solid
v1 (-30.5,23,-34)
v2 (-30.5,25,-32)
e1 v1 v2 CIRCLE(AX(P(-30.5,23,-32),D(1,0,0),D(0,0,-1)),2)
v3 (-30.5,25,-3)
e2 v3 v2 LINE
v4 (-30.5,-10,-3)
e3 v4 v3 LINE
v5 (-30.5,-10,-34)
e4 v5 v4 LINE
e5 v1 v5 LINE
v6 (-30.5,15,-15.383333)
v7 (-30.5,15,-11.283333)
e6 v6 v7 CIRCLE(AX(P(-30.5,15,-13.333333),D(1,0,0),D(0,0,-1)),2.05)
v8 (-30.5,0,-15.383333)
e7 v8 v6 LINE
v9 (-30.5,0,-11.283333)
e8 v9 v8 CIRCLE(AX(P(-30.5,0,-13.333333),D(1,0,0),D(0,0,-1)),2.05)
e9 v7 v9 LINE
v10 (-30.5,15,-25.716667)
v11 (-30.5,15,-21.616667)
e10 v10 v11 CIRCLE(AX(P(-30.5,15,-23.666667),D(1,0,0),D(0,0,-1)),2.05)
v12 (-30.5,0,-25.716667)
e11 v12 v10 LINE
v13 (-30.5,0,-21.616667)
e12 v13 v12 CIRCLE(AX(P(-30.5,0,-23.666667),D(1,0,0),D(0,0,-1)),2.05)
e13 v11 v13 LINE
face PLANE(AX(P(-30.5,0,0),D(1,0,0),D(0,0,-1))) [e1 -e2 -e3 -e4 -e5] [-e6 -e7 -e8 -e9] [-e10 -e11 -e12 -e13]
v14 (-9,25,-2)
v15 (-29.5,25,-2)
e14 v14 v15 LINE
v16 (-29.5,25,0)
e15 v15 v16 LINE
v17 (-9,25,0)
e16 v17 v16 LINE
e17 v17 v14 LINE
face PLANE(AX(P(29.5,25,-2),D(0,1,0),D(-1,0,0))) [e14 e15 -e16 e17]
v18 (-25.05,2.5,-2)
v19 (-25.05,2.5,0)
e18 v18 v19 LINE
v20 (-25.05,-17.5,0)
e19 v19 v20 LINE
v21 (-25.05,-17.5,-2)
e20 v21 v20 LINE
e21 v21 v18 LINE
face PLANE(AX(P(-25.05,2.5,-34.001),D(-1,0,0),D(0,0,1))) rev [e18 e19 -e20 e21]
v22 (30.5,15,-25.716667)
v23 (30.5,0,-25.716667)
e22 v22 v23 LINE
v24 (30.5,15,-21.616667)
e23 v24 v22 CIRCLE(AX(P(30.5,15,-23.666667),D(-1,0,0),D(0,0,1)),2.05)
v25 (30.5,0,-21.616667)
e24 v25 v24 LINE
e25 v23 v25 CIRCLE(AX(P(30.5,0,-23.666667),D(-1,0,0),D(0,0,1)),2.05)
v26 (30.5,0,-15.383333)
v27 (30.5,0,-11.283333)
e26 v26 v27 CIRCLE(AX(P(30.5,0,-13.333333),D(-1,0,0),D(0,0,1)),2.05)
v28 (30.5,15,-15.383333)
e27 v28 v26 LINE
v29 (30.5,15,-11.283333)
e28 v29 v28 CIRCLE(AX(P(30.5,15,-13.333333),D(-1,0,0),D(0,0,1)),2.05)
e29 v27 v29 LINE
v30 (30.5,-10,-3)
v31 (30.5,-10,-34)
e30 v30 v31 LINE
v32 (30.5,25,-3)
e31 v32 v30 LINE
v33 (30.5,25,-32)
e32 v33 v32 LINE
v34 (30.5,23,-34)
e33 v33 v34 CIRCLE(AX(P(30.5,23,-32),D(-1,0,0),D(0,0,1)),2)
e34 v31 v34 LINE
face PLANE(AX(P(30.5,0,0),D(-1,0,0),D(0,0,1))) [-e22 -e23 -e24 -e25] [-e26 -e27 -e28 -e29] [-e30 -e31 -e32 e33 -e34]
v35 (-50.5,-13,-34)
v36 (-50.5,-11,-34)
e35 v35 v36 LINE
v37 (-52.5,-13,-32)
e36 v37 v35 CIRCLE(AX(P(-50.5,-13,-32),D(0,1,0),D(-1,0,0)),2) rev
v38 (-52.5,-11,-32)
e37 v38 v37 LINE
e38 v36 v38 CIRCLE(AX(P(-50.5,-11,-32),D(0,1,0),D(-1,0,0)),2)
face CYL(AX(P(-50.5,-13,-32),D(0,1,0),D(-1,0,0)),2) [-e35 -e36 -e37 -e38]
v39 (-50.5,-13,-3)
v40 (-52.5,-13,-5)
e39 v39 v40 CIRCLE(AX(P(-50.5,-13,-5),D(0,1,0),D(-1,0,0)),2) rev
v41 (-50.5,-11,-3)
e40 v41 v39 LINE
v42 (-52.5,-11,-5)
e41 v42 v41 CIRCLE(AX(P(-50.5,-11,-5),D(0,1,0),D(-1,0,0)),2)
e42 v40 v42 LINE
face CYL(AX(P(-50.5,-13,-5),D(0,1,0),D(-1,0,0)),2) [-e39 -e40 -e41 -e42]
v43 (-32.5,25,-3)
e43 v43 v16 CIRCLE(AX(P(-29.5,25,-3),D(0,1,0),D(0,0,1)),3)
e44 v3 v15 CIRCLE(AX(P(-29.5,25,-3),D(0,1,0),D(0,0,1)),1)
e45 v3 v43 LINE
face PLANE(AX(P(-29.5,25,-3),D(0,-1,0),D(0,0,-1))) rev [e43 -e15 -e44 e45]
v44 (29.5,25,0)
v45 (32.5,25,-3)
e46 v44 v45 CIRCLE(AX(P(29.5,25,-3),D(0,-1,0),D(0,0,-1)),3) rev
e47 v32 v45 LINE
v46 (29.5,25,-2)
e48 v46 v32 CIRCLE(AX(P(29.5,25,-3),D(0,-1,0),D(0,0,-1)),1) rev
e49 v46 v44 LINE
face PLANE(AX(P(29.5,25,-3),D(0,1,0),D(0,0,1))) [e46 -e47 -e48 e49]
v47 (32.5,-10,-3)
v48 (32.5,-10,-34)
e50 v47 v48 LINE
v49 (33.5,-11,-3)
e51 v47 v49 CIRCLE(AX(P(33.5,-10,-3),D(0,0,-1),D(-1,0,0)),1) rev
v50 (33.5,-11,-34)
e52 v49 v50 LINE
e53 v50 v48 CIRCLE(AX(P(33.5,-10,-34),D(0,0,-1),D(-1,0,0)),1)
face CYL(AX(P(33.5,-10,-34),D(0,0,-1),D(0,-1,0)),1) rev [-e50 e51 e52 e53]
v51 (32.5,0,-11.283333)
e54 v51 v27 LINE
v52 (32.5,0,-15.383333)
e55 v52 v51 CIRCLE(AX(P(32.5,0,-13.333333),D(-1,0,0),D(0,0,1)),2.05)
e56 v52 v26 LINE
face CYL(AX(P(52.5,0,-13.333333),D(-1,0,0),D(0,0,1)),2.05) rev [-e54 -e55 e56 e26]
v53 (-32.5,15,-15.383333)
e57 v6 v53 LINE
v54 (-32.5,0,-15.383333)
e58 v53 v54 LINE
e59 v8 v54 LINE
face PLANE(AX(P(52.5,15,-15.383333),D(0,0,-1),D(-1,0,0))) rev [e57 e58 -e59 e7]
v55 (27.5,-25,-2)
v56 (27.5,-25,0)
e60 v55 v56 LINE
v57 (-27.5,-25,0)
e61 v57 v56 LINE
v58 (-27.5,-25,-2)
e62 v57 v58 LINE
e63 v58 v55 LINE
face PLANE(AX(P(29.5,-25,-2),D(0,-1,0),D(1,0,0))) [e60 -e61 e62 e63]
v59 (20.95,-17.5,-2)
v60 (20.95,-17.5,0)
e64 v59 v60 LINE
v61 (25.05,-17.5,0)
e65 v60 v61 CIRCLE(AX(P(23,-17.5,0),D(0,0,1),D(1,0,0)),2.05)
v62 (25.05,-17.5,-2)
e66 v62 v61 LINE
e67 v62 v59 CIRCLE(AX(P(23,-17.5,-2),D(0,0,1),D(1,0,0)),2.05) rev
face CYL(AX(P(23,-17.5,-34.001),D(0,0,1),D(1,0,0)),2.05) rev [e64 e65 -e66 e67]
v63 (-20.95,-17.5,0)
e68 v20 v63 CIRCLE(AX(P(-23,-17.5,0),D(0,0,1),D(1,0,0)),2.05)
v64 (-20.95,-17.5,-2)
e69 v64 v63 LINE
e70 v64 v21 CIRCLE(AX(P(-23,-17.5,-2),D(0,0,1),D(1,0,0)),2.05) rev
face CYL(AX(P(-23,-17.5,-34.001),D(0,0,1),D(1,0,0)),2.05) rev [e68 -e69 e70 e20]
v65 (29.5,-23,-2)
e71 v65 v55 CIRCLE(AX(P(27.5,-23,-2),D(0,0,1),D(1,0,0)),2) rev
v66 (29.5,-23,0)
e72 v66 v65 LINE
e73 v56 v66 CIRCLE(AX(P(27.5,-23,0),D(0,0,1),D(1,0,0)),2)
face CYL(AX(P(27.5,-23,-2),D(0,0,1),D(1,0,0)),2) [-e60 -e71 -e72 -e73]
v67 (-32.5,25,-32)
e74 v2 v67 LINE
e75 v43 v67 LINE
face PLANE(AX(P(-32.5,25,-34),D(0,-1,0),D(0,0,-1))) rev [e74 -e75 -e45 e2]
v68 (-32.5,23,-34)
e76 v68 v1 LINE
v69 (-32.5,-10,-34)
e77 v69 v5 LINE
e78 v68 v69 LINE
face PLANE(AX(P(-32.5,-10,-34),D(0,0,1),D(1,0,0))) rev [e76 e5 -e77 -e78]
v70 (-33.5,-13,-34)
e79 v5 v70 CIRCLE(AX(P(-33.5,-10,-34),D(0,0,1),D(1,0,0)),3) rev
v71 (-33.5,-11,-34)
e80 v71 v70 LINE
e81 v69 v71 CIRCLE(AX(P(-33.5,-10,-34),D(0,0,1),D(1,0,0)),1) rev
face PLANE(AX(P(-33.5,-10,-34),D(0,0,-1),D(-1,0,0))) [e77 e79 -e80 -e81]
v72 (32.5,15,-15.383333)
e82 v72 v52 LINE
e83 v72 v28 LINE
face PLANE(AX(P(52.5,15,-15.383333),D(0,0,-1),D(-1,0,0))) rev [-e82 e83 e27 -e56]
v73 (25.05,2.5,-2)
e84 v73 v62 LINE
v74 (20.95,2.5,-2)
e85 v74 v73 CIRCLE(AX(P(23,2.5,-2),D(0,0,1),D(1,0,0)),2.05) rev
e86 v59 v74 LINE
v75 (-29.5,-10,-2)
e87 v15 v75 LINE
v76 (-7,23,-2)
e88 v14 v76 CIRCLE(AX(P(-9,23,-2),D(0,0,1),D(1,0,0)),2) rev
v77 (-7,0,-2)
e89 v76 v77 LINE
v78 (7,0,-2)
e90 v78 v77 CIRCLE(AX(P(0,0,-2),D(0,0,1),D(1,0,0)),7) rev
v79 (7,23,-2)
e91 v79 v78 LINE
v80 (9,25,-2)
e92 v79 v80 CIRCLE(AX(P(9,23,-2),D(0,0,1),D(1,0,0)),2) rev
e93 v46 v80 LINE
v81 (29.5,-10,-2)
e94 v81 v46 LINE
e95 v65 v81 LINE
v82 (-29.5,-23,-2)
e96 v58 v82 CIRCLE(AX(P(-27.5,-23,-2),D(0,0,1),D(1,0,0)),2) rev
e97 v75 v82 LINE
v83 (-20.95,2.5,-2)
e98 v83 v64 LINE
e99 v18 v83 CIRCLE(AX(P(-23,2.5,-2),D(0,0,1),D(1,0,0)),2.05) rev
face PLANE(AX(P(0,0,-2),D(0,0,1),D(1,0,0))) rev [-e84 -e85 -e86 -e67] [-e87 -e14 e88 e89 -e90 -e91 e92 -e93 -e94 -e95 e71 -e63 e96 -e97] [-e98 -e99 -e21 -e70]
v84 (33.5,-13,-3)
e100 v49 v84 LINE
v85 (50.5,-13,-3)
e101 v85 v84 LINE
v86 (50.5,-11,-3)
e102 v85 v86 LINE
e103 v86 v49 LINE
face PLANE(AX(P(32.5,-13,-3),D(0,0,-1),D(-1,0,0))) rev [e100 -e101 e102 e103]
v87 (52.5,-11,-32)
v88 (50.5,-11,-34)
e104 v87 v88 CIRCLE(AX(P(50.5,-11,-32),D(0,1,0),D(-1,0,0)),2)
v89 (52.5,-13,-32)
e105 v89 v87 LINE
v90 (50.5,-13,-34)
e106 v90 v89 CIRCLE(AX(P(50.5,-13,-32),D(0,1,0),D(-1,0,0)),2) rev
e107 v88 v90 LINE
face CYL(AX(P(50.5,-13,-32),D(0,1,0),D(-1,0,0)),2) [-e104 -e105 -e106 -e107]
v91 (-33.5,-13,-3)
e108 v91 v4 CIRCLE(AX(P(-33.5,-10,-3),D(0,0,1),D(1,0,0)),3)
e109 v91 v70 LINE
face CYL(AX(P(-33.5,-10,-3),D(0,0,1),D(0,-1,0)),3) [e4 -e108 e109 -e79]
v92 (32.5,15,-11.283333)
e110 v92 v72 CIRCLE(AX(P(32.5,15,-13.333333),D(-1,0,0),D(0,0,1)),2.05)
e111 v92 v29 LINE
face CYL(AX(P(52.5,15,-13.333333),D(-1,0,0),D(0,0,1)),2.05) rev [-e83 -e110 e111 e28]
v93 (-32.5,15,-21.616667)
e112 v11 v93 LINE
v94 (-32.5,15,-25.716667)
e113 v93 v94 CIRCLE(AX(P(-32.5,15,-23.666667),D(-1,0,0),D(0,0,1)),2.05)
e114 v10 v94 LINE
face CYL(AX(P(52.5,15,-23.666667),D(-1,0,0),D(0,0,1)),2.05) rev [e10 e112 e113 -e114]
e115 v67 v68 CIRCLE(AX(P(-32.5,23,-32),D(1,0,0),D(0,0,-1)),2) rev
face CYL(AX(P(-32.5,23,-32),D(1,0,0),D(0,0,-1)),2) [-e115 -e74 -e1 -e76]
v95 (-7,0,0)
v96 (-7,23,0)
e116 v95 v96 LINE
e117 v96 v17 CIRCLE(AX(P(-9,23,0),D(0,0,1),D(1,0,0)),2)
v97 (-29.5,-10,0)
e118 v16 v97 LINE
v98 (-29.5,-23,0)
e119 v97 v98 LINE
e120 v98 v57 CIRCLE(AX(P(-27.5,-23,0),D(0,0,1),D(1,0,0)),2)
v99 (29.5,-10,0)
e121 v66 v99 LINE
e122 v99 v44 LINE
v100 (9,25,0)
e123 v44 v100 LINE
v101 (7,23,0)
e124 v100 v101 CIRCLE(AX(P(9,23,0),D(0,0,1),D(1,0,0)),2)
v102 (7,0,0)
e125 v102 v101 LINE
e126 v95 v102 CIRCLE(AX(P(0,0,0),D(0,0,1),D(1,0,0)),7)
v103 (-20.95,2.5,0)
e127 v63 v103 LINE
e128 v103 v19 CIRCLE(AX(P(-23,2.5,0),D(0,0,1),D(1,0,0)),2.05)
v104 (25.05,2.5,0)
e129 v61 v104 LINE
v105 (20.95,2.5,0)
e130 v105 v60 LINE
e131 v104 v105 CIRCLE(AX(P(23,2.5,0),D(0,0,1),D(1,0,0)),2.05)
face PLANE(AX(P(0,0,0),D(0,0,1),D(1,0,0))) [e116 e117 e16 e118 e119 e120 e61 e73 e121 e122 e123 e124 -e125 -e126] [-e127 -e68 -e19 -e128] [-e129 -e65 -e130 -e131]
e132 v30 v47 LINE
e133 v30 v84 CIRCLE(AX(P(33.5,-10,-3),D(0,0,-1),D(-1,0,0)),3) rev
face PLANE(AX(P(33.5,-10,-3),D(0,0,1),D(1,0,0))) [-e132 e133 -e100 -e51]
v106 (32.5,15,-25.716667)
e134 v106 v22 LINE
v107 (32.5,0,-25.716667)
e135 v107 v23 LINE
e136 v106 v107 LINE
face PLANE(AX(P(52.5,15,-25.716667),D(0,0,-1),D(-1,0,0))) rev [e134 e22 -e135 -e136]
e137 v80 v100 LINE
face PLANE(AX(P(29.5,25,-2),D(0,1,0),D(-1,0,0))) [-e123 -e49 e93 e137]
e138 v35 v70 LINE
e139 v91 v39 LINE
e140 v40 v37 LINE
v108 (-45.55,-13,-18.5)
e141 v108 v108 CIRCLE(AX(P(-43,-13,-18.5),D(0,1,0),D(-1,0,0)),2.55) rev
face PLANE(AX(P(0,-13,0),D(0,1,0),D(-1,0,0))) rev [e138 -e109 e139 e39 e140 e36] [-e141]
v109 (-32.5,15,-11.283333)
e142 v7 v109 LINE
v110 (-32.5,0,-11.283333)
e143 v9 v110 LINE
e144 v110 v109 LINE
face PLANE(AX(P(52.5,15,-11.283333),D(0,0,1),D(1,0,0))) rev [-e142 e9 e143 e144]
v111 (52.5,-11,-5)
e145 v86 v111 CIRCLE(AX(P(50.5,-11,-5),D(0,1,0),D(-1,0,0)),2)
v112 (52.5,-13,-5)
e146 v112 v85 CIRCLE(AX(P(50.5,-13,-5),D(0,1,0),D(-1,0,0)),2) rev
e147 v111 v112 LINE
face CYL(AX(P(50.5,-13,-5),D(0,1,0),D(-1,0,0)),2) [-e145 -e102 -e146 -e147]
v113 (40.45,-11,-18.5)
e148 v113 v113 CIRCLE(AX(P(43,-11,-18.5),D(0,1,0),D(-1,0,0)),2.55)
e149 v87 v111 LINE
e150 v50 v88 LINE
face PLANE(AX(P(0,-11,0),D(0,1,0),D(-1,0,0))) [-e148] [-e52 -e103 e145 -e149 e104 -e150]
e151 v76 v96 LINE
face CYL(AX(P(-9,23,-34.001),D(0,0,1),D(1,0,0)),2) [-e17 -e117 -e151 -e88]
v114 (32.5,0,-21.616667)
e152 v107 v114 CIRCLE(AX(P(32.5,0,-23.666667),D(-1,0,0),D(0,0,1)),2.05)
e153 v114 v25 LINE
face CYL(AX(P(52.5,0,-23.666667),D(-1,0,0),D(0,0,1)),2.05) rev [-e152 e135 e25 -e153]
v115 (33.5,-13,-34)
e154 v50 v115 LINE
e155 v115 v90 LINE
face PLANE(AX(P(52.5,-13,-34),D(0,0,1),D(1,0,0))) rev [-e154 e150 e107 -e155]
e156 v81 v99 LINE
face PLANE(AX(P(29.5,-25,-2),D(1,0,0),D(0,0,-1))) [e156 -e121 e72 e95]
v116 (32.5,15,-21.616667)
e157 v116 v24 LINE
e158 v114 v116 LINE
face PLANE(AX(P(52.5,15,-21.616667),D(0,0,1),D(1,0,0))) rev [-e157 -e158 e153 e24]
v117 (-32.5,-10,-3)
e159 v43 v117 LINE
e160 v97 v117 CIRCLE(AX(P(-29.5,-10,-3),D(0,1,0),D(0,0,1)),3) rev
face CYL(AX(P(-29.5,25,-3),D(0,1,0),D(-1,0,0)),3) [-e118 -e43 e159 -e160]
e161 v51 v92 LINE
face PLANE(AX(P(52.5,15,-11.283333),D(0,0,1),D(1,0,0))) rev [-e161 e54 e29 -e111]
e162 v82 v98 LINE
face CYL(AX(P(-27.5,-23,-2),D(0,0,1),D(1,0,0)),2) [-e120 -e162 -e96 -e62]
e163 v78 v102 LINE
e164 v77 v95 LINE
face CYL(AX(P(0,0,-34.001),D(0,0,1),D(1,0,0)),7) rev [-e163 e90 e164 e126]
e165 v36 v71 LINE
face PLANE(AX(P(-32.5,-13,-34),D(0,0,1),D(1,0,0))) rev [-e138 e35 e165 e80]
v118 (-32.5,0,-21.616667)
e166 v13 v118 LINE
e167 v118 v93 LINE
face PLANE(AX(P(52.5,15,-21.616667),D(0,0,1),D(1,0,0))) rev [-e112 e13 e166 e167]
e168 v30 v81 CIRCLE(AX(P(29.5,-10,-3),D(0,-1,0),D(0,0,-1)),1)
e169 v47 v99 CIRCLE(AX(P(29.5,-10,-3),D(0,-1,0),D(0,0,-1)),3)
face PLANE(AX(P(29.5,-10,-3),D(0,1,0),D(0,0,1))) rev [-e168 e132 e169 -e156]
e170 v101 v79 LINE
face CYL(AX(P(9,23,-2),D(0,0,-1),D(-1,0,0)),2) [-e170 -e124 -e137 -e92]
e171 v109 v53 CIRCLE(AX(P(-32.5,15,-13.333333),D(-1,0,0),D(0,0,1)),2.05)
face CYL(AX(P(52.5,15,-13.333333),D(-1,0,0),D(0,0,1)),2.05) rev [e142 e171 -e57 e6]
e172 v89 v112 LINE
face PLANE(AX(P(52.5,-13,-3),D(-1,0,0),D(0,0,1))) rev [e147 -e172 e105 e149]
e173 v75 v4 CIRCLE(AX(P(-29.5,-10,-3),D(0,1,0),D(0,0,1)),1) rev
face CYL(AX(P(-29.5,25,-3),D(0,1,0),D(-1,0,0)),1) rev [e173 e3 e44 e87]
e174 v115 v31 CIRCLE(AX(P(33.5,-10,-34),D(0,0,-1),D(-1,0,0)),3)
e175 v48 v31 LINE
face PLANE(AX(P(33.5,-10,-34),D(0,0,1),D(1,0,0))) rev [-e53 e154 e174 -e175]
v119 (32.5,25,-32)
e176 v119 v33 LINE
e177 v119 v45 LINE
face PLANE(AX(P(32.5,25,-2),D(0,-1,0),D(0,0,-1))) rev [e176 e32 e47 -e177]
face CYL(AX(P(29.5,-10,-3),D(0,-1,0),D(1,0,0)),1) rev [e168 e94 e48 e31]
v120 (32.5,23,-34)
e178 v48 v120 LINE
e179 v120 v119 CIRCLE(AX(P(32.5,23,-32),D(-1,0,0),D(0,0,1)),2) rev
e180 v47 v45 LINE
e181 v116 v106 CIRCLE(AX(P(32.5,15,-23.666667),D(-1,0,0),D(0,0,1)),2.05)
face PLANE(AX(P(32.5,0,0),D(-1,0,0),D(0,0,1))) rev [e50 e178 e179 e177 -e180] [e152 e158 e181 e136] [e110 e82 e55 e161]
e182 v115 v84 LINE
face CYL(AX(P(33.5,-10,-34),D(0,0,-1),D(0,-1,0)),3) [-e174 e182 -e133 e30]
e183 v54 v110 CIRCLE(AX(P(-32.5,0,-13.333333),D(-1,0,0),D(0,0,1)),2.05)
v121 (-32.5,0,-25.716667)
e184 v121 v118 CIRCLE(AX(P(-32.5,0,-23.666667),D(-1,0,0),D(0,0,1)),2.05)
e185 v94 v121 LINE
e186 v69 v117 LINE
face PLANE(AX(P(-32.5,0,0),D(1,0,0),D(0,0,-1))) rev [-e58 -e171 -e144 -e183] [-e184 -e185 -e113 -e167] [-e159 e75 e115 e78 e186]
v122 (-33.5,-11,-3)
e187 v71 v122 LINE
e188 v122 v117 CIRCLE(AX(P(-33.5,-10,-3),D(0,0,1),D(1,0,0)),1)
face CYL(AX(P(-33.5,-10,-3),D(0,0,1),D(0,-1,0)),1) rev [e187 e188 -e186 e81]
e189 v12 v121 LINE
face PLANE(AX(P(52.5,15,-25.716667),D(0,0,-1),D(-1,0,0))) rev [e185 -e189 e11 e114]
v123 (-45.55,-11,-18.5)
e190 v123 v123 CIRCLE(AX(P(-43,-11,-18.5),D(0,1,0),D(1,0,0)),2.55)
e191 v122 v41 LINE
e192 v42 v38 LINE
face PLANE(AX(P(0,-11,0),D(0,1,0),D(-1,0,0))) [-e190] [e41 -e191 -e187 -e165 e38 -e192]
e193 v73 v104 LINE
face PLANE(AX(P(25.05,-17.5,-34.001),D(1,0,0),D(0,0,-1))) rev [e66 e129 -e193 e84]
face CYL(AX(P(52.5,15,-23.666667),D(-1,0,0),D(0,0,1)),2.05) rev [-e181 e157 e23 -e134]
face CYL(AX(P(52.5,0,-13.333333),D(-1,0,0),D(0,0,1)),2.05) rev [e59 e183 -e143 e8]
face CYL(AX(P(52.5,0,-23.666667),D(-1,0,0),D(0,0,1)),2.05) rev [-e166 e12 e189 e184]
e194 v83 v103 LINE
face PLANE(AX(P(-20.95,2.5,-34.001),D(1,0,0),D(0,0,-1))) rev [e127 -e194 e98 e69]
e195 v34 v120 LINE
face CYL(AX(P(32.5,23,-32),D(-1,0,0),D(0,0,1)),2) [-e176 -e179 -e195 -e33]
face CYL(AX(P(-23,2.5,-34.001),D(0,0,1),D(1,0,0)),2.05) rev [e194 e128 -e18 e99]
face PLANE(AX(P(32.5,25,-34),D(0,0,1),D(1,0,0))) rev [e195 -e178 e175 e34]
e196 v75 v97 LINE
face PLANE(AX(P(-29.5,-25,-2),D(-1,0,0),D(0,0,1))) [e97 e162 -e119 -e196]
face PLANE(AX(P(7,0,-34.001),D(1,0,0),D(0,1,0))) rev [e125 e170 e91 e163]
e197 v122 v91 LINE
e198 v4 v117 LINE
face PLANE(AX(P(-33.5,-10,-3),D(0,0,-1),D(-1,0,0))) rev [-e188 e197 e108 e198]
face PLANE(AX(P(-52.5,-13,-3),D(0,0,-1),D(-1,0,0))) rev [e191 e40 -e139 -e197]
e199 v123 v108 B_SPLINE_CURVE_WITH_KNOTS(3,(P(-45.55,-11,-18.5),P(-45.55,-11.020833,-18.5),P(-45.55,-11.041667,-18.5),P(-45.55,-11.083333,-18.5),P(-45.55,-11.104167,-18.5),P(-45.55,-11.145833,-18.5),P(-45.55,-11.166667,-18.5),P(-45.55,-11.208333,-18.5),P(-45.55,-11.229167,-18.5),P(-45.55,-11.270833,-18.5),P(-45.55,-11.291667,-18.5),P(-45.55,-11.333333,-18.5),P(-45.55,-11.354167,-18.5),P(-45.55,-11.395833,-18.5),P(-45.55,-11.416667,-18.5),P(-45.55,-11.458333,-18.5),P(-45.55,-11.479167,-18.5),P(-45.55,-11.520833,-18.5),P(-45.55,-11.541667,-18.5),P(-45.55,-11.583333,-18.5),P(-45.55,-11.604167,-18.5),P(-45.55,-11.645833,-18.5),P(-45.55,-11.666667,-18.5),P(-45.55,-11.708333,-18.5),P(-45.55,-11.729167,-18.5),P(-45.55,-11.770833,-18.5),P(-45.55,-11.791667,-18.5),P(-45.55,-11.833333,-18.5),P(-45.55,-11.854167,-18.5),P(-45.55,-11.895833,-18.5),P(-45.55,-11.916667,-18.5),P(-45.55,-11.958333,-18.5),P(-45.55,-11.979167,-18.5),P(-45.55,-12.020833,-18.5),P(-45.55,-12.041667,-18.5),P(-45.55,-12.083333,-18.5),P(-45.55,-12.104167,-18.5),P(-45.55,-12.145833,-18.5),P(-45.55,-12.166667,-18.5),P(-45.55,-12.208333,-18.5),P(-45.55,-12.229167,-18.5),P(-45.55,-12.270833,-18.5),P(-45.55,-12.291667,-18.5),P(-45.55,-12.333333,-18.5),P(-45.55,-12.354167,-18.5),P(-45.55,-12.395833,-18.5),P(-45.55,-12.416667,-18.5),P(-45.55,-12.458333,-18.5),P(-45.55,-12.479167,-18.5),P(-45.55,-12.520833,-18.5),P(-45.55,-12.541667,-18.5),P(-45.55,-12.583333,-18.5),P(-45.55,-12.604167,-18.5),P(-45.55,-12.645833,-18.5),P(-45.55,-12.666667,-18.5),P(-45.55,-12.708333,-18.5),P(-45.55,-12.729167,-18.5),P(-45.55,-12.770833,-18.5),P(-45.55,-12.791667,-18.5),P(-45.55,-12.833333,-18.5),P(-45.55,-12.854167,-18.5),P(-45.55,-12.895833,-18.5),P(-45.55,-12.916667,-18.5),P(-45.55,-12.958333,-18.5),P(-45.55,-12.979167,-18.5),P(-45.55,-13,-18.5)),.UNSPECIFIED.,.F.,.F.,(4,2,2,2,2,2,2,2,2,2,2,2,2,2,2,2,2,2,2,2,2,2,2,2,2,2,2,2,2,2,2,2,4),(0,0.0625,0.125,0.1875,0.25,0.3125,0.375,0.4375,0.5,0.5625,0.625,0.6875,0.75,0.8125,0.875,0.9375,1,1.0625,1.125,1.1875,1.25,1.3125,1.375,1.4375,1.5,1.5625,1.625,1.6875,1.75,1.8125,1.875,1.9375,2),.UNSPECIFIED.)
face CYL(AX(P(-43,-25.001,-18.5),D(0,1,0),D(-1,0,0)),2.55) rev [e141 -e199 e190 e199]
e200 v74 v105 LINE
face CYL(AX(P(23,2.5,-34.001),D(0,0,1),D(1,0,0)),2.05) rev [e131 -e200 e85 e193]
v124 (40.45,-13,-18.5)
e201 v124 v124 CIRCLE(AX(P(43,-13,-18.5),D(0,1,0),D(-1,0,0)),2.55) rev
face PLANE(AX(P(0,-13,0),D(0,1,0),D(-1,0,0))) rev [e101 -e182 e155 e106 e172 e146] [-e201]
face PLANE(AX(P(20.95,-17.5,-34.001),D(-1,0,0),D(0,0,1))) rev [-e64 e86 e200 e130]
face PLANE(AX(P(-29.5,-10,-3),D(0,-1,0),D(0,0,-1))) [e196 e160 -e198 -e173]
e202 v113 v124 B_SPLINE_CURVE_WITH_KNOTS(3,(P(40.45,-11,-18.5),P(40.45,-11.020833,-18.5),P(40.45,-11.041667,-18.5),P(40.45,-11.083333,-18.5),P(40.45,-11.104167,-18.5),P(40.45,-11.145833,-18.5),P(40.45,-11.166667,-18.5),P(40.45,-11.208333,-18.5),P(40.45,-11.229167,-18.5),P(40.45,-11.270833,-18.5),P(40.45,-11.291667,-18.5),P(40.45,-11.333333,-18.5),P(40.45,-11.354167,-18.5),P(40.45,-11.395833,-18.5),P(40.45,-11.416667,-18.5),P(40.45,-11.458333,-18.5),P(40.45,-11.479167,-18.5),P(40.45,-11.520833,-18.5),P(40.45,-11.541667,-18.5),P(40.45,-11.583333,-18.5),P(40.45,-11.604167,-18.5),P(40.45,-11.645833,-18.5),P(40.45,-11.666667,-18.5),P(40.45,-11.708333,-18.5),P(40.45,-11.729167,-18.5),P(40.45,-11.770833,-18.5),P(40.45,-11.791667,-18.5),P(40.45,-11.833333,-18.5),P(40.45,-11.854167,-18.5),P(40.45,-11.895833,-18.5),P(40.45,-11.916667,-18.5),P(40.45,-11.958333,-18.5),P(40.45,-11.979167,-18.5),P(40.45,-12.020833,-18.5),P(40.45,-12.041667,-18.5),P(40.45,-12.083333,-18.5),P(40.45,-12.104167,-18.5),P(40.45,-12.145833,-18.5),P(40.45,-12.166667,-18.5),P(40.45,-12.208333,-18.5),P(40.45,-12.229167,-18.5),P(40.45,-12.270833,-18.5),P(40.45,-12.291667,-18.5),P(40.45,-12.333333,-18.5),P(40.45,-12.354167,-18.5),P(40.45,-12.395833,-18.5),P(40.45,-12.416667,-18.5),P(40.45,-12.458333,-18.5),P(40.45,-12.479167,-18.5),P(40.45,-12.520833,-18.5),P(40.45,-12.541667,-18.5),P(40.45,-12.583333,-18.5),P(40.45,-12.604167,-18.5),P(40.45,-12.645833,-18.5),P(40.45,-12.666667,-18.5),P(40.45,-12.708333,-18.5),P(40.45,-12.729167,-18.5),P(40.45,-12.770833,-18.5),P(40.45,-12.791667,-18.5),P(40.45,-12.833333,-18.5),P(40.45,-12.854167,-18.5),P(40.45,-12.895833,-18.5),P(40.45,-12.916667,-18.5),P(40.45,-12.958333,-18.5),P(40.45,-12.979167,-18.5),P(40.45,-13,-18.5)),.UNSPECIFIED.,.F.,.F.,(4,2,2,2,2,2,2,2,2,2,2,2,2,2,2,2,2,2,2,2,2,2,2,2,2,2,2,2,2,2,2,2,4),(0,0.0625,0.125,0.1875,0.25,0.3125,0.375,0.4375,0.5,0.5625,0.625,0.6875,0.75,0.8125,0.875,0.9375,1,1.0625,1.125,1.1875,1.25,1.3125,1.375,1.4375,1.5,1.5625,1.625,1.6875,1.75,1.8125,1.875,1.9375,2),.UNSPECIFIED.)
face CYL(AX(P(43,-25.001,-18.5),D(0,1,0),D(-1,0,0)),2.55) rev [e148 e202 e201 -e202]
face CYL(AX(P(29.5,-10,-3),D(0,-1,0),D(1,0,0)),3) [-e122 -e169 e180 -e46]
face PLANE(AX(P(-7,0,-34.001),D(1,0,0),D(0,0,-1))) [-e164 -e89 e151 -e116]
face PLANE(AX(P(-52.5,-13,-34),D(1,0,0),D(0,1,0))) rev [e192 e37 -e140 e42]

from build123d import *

# Parameters (mm, degrees)
SKETCH1_W               = 59
SKETCH1_H               = 50
BASE_FLANGE1_DEPTH      = 2
EDGE_FLANGE1_DEPTH      = 35
EDGE_FLANGE1_BEND_DEPTH = 35
EDGE_FLANGE2_DEPTH      = 31
EDGE_FLANGE2_BEND_DEPTH = 31
CUT_EXTRUDE1_REACH      = 69.359
CUT_EXTRUDE2_REACH      = 74.168
SKETCH19_R              = 2.55
CUT_EXTRUDE3_REACH      = 69.359
SKETCH20_R              = 7
BREAK_CORNER1_START     = -13
BREAK_CORNER1_DEPTH     = 2
BREAK_CORNER1_START_2   = -32.5
BREAK_CORNER1_2_DEPTH   = 65
BREAK_CORNER1_START_3   = -2
BREAK_CORNER1_3_DEPTH   = 2
CUT_EXTRUDE4_DEPTH      = 95.899947313


# Read off the part's stored shape, not the designer's step: Break-Corner1
# Sheet-metal steps are written as plain solids
with BuildPart() as part:
    # Sketch1 → Base-Flange1 (new body)
    with BuildSketch(Plane.XY):
        Rectangle(SKETCH1_W, SKETCH1_H)
    extrude(amount=-BASE_FLANGE1_DEPTH)

    # Edge-Flange1 section (across the edge) → Edge-Flange1 (add)
    with BuildSketch(Plane(origin=(30.5, 25, -2), x_dir=(-1, 0, 0), z_dir=(0, -1, 0))):
        with BuildLine():
            Line((-2, 1), (-2, 32))
            Line((-2, 32), (0, 32))
            Line((0, 32), (0, 1))
            ThreePointArc((0, 1), (0.292893219, 0.292893219), (1, 0))
            Line((1, 0), (1, -2))
            ThreePointArc((1, -2), (-1.121320344, -1.121320344), (-2, 1))
        make_face()
    extrude(amount=EDGE_FLANGE1_DEPTH)

    # Edge-Flange1 section 2 (across the edge) → Edge-Flange1 bend (add)
    with BuildSketch(Plane(origin=(-30.5, -10, -2), x_dir=(1, 0, 0), z_dir=(0, 1, 0))):
        with BuildLine():
            Line((-2, 1), (-2, 32))
            Line((-2, 32), (0, 32))
            Line((0, 32), (0, 1))
            ThreePointArc((0, 1), (0.292893219, 0.292893219), (1, 0))
            Line((1, 0), (1, -2))
            ThreePointArc((1, -2), (-1.121320344, -1.121320344), (-2, 1))
        make_face()
    extrude(amount=EDGE_FLANGE1_BEND_DEPTH)

    # Edge-Flange2 section (across the edge) → Edge-Flange2 (add)
    with BuildSketch(Plane(origin=(32.5, -11, -3), x_dir=(0, 1, 0), z_dir=(0, 0, -1))):
        with BuildLine():
            Line((-2, 1), (-2, 20))
            Line((-2, 20), (0, 20))
            Line((0, 20), (0, 1))
            ThreePointArc((0, 1), (0.292893219, 0.292893219), (1, 0))
            Line((1, 0), (1, -2))
            ThreePointArc((1, -2), (-1.121320344, -1.121320344), (-2, 1))
        make_face()
    extrude(amount=EDGE_FLANGE2_DEPTH)

    # Edge-Flange2 section 2 (across the edge) → Edge-Flange2 bend (add)
    with BuildSketch(Plane(origin=(-32.5, -11, -34), x_dir=(0, 1, 0), z_dir=(0, 0, 1))):
        with BuildLine():
            Line((-2, 1), (-2, 20))
            Line((-2, 20), (0, 20))
            Line((0, 20), (0, 1))
            ThreePointArc((0, 1), (0.292893219, 0.292893219), (1, 0))
            Line((1, 0), (1, -2))
            ThreePointArc((1, -2), (-1.121320344, -1.121320344), (-2, 1))
        make_face()
    extrude(amount=EDGE_FLANGE2_BEND_DEPTH)

    # Sketch18 → Cut-Extrude1 (cut, up to next)
    with BuildSketch(Plane.XY, mode=Mode.PRIVATE) as cut_extrude1_sk1:
        with BuildLine():
            Line((-20.95, 2.5), (-20.95, -17.5))
            ThreePointArc((-20.95, -17.5), (-23, -19.55), (-25.05, -17.5))
            Line((-25.05, -17.5), (-25.05, 2.5))
            ThreePointArc((-25.05, 2.5), (-23, 4.55), (-20.95, 2.5))
        make_face()
    cut_extrude1_tool1 = extrude(cut_extrude1_sk1.sketch, amount=-CUT_EXTRUDE1_REACH, mode=Mode.PRIVATE) & part.part
    # Sketch18 → Cut-Extrude1 (cut, up to next)
    with BuildSketch(Plane.XY, mode=Mode.PRIVATE) as cut_extrude1_sk2:
        with BuildLine():
            Line((20.95, -17.5), (20.95, 2.5))
            ThreePointArc((20.95, 2.5), (23, 4.55), (25.05, 2.5))
            Line((25.05, 2.5), (25.05, -17.5))
            ThreePointArc((25.05, -17.5), (23, -19.55), (20.95, -17.5))
        make_face()
    cut_extrude1_tool2 = extrude(cut_extrude1_sk2.sketch, amount=-CUT_EXTRUDE1_REACH, mode=Mode.PRIVATE) & part.part
    add(cut_extrude1_tool1.solids().sort_by_distance((-23, -7.5, 0))[0], mode=Mode.SUBTRACT)
    add(cut_extrude1_tool2.solids().sort_by_distance((23, -7.5, 0))[0], mode=Mode.SUBTRACT)

    # Sketch19 → Cut-Extrude2 (cut, up to next)
    with BuildSketch(Plane(origin=(0, -11, 0), x_dir=(1, 0, 0), z_dir=(0, 1, 0)), mode=Mode.PRIVATE) as cut_extrude2_sk1:
        with Locations(Location((43, 18.5, 0), (0, 0, 180))):
            Circle(SKETCH19_R)
    cut_extrude2_tool1 = extrude(cut_extrude2_sk1.sketch, amount=-CUT_EXTRUDE2_REACH, mode=Mode.PRIVATE) & part.part
    # Sketch19 → Cut-Extrude2 (cut, up to next)
    with BuildSketch(Plane(origin=(0, -11, 0), x_dir=(1, 0, 0), z_dir=(0, 1, 0)), mode=Mode.PRIVATE) as cut_extrude2_sk2:
        with Locations(Location((-43, 18.5, 0), (0, 0, 180))):
            Circle(SKETCH19_R)
    cut_extrude2_tool2 = extrude(cut_extrude2_sk2.sketch, amount=-CUT_EXTRUDE2_REACH, mode=Mode.PRIVATE) & part.part
    add(cut_extrude2_tool1.solids().sort_by_distance((43, -11, -18.5))[0], mode=Mode.SUBTRACT)
    add(cut_extrude2_tool2.solids().sort_by_distance((-43, -11, -18.5))[0], mode=Mode.SUBTRACT)

    # Sketch20 → Cut-Extrude3 (cut, up to next)
    with BuildSketch(Plane.XY, mode=Mode.PRIVATE) as cut_extrude3_sk1:
        Circle(SKETCH20_R)
    cut_extrude3_tool1 = extrude(cut_extrude3_sk1.sketch, amount=-CUT_EXTRUDE3_REACH, mode=Mode.PRIVATE) & part.part
    # Sketch20 → Cut-Extrude3 (cut, up to next)
    with BuildSketch(Plane.XY, mode=Mode.PRIVATE) as cut_extrude3_sk2:
        with BuildLine():
            ThreePointArc((-7, 0), (0, 7), (7, 0))
            Line((7, 0), (7, 25))
            Line((7, 25), (-7, 25))
            Line((-7, 25), (-7, 0))
        make_face()
    cut_extrude3_tool2 = extrude(cut_extrude3_sk2.sketch, amount=-CUT_EXTRUDE3_REACH, mode=Mode.PRIVATE) & part.part
    add(cut_extrude3_tool1.solids().sort_by_distance((0, 0, 0))[0], mode=Mode.SUBTRACT)
    add(cut_extrude3_tool2.solids().sort_by_distance((0, 15.186311, 0))[0], mode=Mode.SUBTRACT)

    # Break-Corner1 outline → Break-Corner1 (cut)
    with BuildSketch(Plane(origin=(0, 0, 0), x_dir=(1, 0, 0), z_dir=(0, 1, 0)).offset(BREAK_CORNER1_START)):
        with BuildLine():
            ThreePointArc((50.5, 34), (51.914213562, 33.414213562), (52.5, 32))
            Line((52.5, 32), (52.5, 34))
            Line((52.5, 34), (50.5, 34))
        make_face()
        with BuildLine():
            ThreePointArc((52.5, 5), (51.914213562, 3.585786438), (50.5, 3))
            Line((50.5, 3), (52.5, 3))
            Line((52.5, 3), (52.5, 5))
        make_face()
        with BuildLine():
            ThreePointArc((-50.5, 3), (-51.914213562, 3.585786438), (-52.5, 5))
            Line((-52.5, 5), (-52.5, 3))
            Line((-52.5, 3), (-50.5, 3))
        make_face()
        with BuildLine():
            ThreePointArc((-52.5, 32), (-51.914213562, 33.414213562), (-50.5, 34))
            Line((-50.5, 34), (-52.5, 34))
            Line((-52.5, 34), (-52.5, 32))
        make_face()
    extrude(amount=BREAK_CORNER1_DEPTH, mode=Mode.SUBTRACT)

    # Break-Corner1 2 outline → Break-Corner1 2 (cut)
    with BuildSketch(Plane.YZ.offset(BREAK_CORNER1_START_2)):
        with BuildLine():
            Line((25, -34), (25, -32))
            ThreePointArc((25, -32), (24.414213562, -33.414213562), (23, -34))
            Line((23, -34), (25, -34))
        make_face()
    extrude(amount=BREAK_CORNER1_2_DEPTH, mode=Mode.SUBTRACT)

    # Break-Corner1 3 outline → Break-Corner1 3 (cut)
    with BuildSketch(Plane.XY.offset(BREAK_CORNER1_START_3)):
        with BuildLine():
            Line((7, 25), (7, 23))
            ThreePointArc((7, 23), (7.585786438, 24.414213562), (9, 25))
            Line((9, 25), (7, 25))
        make_face()
        with BuildLine():
            Line((-29.5, -25), (-27.5, -25))
            ThreePointArc((-27.5, -25), (-28.914213562, -24.414213562), (-29.5, -23))
            Line((-29.5, -23), (-29.5, -25))
        make_face()
        with BuildLine():
            ThreePointArc((29.5, -23), (28.914213562, -24.414213562), (27.5, -25))
            Line((27.5, -25), (29.5, -25))
            Line((29.5, -25), (29.5, -23))
        make_face()
        with BuildLine():
            ThreePointArc((-9, 25), (-7.585786438, 24.414213562), (-7, 23))
            Line((-7, 23), (-7, 25))
            Line((-7, 25), (-9, 25))
        make_face()
    extrude(amount=BREAK_CORNER1_3_DEPTH, mode=Mode.SUBTRACT)

    # Sketch21 → Cut-Extrude4 (cut, through all)
    with BuildSketch(Plane.ZY.offset(32.5)):
        with BuildLine():
            Line((-21.616666667, 15), (-21.616666667, 0))
            ThreePointArc((-21.616666667, 0), (-23.666666667, -2.05), (-25.716666667, 0))
            Line((-25.716666667, 0), (-25.716666667, 15))
            ThreePointArc((-25.716666667, 15), (-23.666666667, 17.05), (-21.616666667, 15))
        make_face()
        with BuildLine():
            Line((-11.283333333, 15), (-11.283333333, 0))
            ThreePointArc((-11.283333333, 0), (-13.333333333, -2.05), (-15.383333333, 0))
            Line((-15.383333333, 0), (-15.383333333, 15))
            ThreePointArc((-15.383333333, 15), (-13.333333333, 17.05), (-11.283333333, 15))
        make_face()
    extrude(amount=-CUT_EXTRUDE4_DEPTH, mode=Mode.SUBTRACT)


solid = part.part
